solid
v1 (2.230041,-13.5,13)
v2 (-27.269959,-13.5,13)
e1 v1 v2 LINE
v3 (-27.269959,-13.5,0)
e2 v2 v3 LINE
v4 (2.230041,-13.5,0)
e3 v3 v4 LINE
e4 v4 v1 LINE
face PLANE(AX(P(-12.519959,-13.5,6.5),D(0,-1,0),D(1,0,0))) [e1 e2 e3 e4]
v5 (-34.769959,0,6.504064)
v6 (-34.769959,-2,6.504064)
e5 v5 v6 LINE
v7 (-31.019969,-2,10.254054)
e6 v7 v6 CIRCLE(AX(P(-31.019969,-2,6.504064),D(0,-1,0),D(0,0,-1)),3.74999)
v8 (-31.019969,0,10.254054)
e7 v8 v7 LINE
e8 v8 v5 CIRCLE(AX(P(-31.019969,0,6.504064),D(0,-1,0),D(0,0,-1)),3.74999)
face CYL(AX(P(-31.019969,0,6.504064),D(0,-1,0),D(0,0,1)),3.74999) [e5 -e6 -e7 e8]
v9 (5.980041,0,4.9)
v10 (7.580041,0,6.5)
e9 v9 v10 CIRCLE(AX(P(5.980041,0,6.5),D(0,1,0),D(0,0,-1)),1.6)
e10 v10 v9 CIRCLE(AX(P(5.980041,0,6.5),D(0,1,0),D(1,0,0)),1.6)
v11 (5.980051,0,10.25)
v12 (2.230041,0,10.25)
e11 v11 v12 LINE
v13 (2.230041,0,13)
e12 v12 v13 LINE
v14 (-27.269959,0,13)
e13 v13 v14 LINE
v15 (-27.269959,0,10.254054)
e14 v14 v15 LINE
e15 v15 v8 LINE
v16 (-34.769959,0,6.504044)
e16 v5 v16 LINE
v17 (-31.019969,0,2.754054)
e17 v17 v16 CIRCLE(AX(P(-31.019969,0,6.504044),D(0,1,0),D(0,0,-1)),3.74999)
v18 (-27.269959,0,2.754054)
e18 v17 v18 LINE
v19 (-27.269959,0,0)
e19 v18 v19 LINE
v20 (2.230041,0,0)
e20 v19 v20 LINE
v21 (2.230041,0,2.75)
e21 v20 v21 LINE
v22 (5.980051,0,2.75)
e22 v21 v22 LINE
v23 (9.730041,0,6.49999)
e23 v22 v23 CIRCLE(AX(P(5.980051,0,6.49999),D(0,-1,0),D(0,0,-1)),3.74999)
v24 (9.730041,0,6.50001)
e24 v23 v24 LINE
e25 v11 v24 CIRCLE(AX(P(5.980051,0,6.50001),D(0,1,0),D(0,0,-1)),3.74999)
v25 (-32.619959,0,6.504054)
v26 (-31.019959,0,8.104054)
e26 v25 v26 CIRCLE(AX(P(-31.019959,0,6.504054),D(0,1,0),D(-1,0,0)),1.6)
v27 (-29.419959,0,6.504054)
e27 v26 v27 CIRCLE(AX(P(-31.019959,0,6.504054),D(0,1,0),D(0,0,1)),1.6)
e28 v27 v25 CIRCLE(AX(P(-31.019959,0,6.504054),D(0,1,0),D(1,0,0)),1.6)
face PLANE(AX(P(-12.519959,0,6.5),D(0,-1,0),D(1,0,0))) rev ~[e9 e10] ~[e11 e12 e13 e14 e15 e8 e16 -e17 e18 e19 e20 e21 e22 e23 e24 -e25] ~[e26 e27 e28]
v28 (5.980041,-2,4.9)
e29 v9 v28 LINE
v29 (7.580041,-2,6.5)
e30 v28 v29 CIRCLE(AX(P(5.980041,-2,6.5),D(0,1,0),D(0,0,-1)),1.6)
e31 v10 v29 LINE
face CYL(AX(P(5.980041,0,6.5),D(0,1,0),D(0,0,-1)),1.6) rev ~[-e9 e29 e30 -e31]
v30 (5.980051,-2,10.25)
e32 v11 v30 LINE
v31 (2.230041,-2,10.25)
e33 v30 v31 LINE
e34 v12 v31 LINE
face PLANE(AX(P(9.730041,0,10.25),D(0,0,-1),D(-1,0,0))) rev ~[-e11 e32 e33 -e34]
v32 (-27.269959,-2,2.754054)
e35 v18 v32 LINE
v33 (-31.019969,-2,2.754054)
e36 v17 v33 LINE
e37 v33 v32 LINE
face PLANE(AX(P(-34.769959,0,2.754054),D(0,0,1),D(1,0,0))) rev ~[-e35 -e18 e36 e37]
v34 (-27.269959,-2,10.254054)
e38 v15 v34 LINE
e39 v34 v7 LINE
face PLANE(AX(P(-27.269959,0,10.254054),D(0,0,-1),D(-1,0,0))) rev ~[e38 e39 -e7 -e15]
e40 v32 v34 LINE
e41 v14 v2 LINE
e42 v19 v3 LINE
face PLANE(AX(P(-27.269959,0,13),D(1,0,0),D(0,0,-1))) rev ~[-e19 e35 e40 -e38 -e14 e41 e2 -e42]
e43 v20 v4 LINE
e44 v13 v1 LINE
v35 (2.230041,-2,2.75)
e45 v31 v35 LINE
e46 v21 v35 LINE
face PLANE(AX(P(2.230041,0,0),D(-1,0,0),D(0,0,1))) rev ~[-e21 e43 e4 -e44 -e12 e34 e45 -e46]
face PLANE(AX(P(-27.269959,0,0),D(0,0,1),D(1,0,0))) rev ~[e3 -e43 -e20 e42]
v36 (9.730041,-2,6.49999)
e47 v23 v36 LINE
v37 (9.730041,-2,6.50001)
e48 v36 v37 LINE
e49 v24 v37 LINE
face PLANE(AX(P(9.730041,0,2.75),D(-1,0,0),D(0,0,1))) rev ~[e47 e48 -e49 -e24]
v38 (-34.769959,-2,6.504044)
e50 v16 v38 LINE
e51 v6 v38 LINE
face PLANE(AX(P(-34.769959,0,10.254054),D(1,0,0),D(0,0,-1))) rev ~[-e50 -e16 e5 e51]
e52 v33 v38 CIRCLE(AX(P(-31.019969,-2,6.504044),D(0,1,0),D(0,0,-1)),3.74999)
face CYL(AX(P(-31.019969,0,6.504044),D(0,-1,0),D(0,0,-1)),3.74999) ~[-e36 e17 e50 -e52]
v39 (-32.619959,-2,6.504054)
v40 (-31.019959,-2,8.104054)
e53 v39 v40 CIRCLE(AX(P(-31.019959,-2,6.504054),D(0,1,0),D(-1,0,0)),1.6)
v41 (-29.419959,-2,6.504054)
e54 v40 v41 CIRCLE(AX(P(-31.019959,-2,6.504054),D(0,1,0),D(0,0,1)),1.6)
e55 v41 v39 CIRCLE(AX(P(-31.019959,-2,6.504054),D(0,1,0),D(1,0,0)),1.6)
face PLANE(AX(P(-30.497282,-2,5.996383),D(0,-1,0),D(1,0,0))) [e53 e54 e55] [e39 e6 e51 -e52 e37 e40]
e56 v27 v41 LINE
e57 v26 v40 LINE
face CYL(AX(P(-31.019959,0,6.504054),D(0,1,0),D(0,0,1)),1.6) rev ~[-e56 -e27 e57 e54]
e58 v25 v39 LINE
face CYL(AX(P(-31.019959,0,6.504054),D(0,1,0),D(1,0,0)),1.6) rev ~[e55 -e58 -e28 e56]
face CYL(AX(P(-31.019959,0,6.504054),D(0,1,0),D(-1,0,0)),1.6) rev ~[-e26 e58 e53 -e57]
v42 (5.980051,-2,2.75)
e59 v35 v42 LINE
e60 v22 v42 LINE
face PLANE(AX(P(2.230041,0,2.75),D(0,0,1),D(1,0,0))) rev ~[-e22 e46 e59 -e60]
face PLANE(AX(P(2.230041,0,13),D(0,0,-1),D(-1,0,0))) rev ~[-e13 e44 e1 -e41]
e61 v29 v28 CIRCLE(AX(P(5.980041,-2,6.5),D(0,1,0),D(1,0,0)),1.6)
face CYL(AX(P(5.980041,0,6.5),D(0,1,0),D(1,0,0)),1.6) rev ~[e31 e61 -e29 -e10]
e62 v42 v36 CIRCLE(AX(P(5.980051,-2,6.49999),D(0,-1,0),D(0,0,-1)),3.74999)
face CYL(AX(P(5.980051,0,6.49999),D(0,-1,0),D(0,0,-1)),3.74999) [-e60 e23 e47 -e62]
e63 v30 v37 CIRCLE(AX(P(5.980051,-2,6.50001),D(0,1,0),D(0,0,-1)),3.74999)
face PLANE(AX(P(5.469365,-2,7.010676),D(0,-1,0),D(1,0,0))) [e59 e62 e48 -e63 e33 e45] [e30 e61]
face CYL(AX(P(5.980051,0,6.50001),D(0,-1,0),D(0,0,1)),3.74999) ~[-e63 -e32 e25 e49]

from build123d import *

# Parameters (mm, degrees)
F1_DEPTH = 13.5
F2_DEPTH = 2
F3_R     = 3.74999
F4_DEPTH = 2
F5_R     = 3.74999


# Not quite as in the source:
# - a fillet or chamfer is up to 0.001 mm smaller than in the source, because OpenCascade refuses the exact size
# - a feature names something its author has since deleted; it is built from what else it names


with BuildPart() as f1:
    # F0 (on Front) → F1 (new body)
    with BuildSketch(Plane.XZ):
        Polygon((2.2300408515, 13), (-27.2699591485, 13), (-27.2699591485, 10.2540537994), (-27.2699591485, 2.7540537994), (-27.2699591485, 0), (2.2300408515, 0), (2.2300408515, 2.75), (2.2300408515, 10.25), align=None)
    extrude(amount=F1_DEPTH)

    # F0 (on Front) → F2 (join)
    with BuildSketch(Plane.XZ):
        with BuildLine():
            Line((-27.2699591485, 2.7540537994), (-27.2699591485, 10.2540537994))
            Line((-27.2699591485, 10.2540537994), (-31.0199591485, 10.2540537994))
            Line((-31.0199591485, 10.2540537994), (-31.0199591485, 8.1040537994))
            ThreePointArc((-31.0199591485, 8.1040537994), (-29.8885882986, 7.6354246493), (-29.4199591485, 6.5040537994))
            ThreePointArc((-29.4199591485, 6.5040537994), (-31.0199591485, 4.9040537994), (-32.6199591485, 6.5040537994))
            Line((-32.6199591485, 6.5040537994), (-34.7699591485, 6.5040537994))
            Line((-34.7699591485, 6.5040537994), (-34.7699591485, 2.7540537994))
            Line((-34.7699591485, 2.7540537994), (-27.2699591485, 2.7540537994))
        make_face()
        with BuildLine():
            Line((-31.0199591485, 8.1040537994), (-31.0199591485, 10.2540537994))
            Line((-31.0199591485, 10.2540537994), (-34.7699591485, 10.2540537994))
            Line((-34.7699591485, 10.2540537994), (-34.7699591485, 6.5040537994))
            Line((-34.7699591485, 6.5040537994), (-32.6199591485, 6.5040537994))
            ThreePointArc((-32.6199591485, 6.5040537994), (-32.1513299984, 7.6354246493), (-31.0199591485, 8.1040537994))
        make_face()
    extrude(amount=F2_DEPTH)

    # F3 (radius 3.75 in the source; OpenCascade refuses exactly that, so slightly less here)
    f3_edges = [f1.edges().sort_by_distance(p)[0] for p in [
        (-34.769959, -1, 10.254054),
        (-34.769959, -1, 2.754054),
    ]]
    fillet(f3_edges, radius=F3_R)

    # F0 (on Front) → F4 (join)
    with BuildSketch(Plane.XZ):
        with BuildLine():
            Line((9.7300408515, 10.25), (2.2300408515, 10.25))
            Line((2.2300408515, 10.25), (2.2300408515, 2.75))
            Line((2.2300408515, 2.75), (5.9800408515, 2.75))
            Line((5.9800408515, 2.75), (5.9800408515, 4.9))
            ThreePointArc((5.9800408515, 4.9), (4.8486700016, 7.6313708499), (7.5800408515, 6.5))
            Line((7.5800408515, 6.5), (9.7300408515, 6.5))
            Line((9.7300408515, 6.5), (9.7300408515, 10.25))
        make_face()
        with BuildLine():
            Line((5.9800408515, 4.9), (5.9800408515, 2.75))
            Line((5.9800408515, 2.75), (9.7300408515, 2.75))
            Line((9.7300408515, 2.75), (9.7300408515, 6.5))
            Line((9.7300408515, 6.5), (7.5800408515, 6.5))
            ThreePointArc((7.5800408515, 6.5), (7.1114117014, 5.3686291501), (5.9800408515, 4.9))
        make_face()
    extrude(amount=F4_DEPTH)

    # F5 (radius 3.75 in the source; OpenCascade refuses exactly that, so slightly less here)
    f5_edges = [f1.edges().sort_by_distance(p)[0] for p in [
        (9.730041, -1, 10.25),
        (9.730041, -1, 2.75),
    ]]
    fillet(f5_edges, radius=F5_R)


solid = f1.part
